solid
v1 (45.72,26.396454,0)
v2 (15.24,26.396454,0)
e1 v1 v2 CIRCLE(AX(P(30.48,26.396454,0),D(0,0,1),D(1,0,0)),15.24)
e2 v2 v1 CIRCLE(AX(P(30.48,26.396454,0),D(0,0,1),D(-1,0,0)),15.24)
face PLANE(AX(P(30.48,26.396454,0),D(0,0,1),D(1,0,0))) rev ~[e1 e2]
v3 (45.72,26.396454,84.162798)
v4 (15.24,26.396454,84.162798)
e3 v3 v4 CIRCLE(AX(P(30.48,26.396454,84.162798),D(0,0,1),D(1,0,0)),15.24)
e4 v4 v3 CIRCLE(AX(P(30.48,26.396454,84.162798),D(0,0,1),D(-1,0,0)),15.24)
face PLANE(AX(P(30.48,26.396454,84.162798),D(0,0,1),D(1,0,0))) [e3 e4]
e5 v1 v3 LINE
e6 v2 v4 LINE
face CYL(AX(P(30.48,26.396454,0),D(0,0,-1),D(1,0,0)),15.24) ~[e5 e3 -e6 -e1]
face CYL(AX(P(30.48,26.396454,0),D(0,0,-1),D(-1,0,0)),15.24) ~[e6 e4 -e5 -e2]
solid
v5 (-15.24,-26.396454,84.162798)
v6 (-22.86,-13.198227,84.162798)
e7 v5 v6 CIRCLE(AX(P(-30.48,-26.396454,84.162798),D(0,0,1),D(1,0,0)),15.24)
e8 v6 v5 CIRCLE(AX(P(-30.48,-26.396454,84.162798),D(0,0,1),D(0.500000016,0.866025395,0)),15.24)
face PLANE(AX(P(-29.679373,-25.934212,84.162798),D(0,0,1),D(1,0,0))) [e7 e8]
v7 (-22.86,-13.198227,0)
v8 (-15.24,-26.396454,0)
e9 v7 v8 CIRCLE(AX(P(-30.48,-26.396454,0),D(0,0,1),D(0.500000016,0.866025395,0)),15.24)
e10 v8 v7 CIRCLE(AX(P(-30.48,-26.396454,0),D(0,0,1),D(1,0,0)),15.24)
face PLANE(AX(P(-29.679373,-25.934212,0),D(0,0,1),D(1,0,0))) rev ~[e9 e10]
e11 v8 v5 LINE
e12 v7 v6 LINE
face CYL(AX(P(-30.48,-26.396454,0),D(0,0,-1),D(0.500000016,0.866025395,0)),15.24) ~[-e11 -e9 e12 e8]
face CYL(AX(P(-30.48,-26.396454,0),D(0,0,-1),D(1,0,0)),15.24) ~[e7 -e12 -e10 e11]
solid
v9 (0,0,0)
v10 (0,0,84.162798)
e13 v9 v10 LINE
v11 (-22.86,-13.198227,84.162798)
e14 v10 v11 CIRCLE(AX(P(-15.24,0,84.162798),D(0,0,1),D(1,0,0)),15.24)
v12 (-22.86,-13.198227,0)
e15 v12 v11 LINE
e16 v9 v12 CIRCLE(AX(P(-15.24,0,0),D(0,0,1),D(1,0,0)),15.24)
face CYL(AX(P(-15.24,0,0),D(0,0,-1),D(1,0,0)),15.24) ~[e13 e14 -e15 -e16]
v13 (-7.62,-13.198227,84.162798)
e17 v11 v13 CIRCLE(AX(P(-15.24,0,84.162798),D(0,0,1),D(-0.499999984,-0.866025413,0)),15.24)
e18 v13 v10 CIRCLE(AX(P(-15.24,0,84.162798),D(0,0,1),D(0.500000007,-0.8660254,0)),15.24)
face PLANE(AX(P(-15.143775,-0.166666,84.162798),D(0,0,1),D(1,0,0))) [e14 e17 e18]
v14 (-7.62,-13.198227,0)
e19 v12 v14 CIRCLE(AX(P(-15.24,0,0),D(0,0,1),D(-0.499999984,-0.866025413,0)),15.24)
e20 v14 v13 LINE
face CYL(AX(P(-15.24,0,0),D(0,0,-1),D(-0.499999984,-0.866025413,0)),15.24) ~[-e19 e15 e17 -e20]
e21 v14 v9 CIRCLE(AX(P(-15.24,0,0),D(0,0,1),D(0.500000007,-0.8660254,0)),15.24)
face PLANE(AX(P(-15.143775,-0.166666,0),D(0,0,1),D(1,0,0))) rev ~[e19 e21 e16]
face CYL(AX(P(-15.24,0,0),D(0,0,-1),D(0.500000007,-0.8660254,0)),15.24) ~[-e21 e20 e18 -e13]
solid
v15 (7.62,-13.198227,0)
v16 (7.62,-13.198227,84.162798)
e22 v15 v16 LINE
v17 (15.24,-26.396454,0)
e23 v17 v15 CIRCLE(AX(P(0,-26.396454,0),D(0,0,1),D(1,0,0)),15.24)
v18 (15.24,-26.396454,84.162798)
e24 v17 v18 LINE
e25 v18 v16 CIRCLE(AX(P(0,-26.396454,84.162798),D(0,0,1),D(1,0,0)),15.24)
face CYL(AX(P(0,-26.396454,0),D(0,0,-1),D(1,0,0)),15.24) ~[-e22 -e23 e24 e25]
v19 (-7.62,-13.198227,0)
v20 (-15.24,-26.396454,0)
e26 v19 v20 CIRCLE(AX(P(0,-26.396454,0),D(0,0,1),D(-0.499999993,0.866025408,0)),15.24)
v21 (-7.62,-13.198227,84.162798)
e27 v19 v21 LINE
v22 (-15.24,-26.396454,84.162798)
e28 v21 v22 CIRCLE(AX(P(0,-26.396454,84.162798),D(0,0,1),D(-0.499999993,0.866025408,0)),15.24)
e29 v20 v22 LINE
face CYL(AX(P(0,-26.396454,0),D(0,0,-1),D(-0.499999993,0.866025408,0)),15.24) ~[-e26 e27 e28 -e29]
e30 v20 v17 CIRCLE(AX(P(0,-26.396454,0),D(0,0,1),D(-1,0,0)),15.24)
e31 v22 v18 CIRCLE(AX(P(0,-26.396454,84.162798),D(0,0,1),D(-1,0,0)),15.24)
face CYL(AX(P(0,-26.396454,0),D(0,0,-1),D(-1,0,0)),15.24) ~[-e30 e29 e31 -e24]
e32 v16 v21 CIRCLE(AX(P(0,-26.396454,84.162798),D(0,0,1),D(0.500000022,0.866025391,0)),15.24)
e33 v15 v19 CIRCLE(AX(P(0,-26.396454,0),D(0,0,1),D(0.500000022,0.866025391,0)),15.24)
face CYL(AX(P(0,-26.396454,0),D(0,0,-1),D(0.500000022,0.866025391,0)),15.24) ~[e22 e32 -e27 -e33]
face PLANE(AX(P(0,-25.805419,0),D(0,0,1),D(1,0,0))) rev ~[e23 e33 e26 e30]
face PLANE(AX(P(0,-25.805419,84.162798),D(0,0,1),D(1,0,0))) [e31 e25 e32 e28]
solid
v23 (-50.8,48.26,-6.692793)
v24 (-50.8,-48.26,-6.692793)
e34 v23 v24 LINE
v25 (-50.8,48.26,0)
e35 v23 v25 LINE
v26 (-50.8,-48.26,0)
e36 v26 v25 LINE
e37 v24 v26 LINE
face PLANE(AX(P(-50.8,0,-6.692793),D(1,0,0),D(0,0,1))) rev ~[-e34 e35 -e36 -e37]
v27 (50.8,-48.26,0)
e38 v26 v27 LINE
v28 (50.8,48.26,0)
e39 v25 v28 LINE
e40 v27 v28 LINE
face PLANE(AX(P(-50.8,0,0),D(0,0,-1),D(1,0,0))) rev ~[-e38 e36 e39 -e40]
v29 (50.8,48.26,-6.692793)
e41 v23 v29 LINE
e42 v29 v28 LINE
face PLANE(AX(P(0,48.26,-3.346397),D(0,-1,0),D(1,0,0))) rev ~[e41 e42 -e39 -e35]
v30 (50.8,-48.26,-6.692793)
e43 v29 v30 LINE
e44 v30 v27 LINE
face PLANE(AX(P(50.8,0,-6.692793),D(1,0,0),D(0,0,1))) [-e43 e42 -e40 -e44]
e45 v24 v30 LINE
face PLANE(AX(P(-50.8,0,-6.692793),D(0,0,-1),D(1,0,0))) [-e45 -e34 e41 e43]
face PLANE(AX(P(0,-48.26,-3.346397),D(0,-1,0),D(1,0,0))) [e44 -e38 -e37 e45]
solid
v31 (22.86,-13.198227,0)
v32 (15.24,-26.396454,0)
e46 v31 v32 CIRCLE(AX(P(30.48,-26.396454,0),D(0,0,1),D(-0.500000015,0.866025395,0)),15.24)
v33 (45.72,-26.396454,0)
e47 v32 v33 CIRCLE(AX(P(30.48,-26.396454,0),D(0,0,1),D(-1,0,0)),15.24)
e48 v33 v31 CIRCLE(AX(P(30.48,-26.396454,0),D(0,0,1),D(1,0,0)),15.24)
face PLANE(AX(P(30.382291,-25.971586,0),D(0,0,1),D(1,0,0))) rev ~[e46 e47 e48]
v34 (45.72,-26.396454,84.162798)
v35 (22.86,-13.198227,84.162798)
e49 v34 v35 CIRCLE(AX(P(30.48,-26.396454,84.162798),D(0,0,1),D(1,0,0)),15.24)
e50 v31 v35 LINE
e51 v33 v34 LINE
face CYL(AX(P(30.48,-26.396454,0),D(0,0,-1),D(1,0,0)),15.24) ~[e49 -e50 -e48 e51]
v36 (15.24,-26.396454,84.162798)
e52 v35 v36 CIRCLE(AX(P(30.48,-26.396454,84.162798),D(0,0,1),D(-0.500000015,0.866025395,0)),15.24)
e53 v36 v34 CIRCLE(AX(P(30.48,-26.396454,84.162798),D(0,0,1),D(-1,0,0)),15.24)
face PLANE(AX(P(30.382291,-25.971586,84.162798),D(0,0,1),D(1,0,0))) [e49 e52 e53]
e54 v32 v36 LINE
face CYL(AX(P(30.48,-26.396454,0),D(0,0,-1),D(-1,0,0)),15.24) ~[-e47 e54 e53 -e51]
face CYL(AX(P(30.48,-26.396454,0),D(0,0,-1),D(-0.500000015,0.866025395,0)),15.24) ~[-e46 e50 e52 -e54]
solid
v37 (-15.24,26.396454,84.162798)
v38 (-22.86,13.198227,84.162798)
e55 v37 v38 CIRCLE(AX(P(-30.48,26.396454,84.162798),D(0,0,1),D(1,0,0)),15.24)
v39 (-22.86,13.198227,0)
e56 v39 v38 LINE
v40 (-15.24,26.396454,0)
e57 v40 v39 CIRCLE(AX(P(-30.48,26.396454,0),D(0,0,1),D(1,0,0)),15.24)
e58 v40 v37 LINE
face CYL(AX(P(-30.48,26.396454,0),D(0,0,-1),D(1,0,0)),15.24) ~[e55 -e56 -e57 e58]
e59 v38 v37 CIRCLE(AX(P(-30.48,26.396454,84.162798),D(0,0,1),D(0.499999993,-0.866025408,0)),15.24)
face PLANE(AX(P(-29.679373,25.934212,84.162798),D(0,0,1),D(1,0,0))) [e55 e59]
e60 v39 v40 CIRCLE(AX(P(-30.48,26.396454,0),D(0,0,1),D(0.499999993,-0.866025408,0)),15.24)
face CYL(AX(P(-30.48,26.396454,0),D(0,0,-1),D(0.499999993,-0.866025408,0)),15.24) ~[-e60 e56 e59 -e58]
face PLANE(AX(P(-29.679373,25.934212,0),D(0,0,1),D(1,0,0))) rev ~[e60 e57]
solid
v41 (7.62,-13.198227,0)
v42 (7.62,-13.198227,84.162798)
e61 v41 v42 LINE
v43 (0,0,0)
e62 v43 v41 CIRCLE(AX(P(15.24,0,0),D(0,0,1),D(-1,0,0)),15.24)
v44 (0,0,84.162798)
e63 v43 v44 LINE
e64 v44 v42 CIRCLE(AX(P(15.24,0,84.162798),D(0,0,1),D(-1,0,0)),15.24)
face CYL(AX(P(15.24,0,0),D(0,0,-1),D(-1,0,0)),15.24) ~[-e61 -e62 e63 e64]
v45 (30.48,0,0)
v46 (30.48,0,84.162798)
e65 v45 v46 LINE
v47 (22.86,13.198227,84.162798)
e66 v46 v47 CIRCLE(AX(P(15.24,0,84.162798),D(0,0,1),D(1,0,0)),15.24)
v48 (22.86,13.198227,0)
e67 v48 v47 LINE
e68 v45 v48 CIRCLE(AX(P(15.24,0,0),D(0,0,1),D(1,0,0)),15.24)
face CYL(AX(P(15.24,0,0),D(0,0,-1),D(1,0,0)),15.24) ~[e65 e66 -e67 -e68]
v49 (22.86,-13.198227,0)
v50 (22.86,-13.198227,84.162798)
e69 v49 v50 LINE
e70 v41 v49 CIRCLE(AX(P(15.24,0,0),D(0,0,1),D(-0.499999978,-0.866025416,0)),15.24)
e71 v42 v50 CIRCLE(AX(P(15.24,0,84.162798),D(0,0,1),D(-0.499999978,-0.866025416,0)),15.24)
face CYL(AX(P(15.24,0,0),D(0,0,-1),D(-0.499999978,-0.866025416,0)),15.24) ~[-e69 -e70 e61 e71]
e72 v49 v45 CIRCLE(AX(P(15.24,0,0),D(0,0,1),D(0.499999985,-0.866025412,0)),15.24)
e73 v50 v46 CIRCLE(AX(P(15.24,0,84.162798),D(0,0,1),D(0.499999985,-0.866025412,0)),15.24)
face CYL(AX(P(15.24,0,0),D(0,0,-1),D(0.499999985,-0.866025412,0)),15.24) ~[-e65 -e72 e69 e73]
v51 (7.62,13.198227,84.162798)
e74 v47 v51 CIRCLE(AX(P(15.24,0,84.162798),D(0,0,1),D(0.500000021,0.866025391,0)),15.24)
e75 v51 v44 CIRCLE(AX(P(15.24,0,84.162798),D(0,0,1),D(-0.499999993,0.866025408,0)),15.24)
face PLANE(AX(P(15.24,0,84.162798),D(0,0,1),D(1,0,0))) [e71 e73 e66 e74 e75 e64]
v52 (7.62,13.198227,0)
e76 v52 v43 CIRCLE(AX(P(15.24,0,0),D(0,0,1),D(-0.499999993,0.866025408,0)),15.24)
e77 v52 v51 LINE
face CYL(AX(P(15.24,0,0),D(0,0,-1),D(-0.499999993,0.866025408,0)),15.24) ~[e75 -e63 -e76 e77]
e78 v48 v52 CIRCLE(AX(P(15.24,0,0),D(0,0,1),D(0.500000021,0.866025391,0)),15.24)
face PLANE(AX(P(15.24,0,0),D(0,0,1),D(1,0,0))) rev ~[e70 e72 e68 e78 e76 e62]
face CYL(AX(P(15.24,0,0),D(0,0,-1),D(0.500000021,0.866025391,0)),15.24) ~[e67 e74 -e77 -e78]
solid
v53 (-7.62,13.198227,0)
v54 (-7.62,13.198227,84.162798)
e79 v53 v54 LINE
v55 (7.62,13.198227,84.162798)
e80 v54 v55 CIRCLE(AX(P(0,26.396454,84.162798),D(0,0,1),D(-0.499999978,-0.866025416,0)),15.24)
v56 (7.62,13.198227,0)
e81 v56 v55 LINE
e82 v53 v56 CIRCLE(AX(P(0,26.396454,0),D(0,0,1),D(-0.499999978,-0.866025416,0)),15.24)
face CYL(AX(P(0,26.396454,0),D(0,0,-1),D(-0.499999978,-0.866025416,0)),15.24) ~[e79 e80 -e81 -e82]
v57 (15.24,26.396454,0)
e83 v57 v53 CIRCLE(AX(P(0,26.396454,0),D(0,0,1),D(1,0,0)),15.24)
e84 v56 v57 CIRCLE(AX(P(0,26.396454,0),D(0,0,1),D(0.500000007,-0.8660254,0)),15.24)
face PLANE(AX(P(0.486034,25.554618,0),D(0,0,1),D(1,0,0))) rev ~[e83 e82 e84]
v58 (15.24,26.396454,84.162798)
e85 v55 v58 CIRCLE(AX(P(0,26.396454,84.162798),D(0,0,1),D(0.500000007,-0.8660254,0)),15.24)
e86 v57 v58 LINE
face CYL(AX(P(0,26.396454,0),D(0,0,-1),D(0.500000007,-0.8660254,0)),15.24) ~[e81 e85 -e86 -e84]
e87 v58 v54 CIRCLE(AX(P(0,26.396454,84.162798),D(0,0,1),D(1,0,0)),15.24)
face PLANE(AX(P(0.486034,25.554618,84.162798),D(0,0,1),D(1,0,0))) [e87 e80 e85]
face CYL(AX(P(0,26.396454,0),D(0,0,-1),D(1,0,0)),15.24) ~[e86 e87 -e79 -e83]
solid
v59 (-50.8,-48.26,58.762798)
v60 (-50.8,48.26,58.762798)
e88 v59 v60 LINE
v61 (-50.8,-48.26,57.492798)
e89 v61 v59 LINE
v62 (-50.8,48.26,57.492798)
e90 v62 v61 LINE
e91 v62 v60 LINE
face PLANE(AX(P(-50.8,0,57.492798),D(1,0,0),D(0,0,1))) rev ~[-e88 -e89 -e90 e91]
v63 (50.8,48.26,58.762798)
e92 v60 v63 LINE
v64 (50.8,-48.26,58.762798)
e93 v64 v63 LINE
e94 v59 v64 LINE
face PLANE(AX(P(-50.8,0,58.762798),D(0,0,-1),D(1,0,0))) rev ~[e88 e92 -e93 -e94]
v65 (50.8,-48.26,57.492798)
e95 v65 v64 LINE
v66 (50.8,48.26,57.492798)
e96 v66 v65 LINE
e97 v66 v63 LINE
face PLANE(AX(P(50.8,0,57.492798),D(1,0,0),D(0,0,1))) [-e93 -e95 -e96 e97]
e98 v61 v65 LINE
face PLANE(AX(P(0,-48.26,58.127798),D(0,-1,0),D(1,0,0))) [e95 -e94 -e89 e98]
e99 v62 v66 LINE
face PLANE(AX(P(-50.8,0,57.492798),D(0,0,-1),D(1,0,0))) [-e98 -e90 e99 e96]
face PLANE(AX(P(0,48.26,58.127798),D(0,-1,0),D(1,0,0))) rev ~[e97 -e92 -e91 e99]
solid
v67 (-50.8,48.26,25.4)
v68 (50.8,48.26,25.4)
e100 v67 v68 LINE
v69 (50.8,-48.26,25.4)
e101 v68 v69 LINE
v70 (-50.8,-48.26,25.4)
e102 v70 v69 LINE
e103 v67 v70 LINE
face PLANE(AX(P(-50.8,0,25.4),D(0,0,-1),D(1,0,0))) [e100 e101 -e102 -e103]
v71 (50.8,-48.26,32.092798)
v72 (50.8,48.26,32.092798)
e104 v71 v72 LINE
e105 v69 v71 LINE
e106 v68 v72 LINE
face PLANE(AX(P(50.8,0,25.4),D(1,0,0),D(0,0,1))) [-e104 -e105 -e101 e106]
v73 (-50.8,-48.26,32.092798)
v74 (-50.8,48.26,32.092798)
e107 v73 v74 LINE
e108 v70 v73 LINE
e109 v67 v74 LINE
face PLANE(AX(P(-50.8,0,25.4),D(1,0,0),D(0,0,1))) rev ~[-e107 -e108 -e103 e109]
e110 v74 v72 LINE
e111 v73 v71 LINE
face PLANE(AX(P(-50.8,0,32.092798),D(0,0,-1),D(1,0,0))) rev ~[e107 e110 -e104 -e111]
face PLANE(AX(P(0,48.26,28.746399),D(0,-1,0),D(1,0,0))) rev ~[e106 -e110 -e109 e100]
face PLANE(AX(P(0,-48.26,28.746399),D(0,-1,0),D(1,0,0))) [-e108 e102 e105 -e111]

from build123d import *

# Parameters (mm, degrees)
F1_DEPTH = 84.1627984
F2_W     = 101.6
F2_H     = 6.6927933697
F3_DEPTH = 48.26
F2_H_2   = 6.6927984
F2_H_3   = 1.27


# Not quite as in the source:
# - a feature names something its author has since deleted; it is built from what else it names


with BuildPart() as f1:
    # F0 (on Top) → F1 (new body)
    with BuildSketch(Plane.XY):
        with BuildLine():
            ThreePointArc((-22.8599997596, -13.1982272925), (-43.6782272231, -34.0164541872), (-15.24, -26.3964543073))
            ThreePointArc((-15.24, -26.3964543073), (-17.2817727769, -18.7764544275), (-22.8599997596, -13.1982272925))
        make_face()
    extrude(amount=F1_DEPTH)


with BuildPart() as f1b:
    # F0 (on Top) → F1, piece 2 (new body)
    with BuildSketch(Plane.XY):
        with BuildLine():
            ThreePointArc((-7.6199998958, -13.1982270935), (-13.1982271236, -18.7764542553), (-15.24, -26.3964543073))
            ThreePointArc((-15.24, -26.3964543073), (0, -41.6364543073), (15.24, -26.3964543073))
            ThreePointArc((15.24, -26.3964543073), (13.1982272501, -18.7764544743), (7.6200003339, -13.1982273465))
            ThreePointArc((7.6200003339, -13.1982273465), (2.529e-07, -11.1564543073), (-7.6199998958, -13.1982270935))
        make_face()
    extrude(amount=F1_DEPTH)


with BuildPart() as f1c:
    # F0 (on Top) → F1, piece 3 (new body)
    with BuildSketch(Plane.XY):
        with BuildLine():
            ThreePointArc((-22.8600001039, 13.1982270937), (-30.48, -1.988e-07), (-22.8599997596, -13.1982272925))
            ThreePointArc((-22.8599997596, -13.1982272925), (-15.2399998011, -15.24), (-7.6199998958, -13.1982270935))
            ThreePointArc((-7.6199998958, -13.1982270935), (-2.0417728163, -7.6199999479), (0, 0))
            ThreePointArc((0, 0), (-2.0417727499, 7.619999833), (-7.6199996661, 13.1982269609))
            ThreePointArc((-7.6199996661, 13.1982269609), (-15.2399998672, 15.24), (-22.8600001039, 13.1982270937))
        make_face()
    extrude(amount=F1_DEPTH)


with BuildPart() as f1d:
    # F0 (on Top) → F1, piece 4 (new body)
    with BuildSketch(Plane.XY):
        with BuildLine():
            ThreePointArc((22.8599997751, -13.1982272835), (17.2817727814, -18.7764544198), (15.24, -26.3964543073))
            ThreePointArc((15.24, -26.3964543073), (30.48, -41.6364543073), (45.72, -26.3964543073))
            ThreePointArc((45.72, -26.3964543073), (38.0999998875, -13.1982270887), (22.8599997751, -13.1982272835))
        make_face()
    extrude(amount=F1_DEPTH)


with BuildPart() as f1e:
    # F0 (on Top) → F1, piece 5 (new body)
    with BuildSketch(Plane.XY):
        with BuildLine():
            ThreePointArc((-15.24, 26.3964543073), (-43.6782271237, 34.0164543593), (-22.8600001039, 13.1982270937))
            ThreePointArc((-22.8600001039, 13.1982270937), (-17.2817728763, 18.7764542554), (-15.24, 26.3964543073))
        make_face()
    extrude(amount=F1_DEPTH)


with BuildPart() as f1f:
    # F0 (on Top) → F1, piece 6 (new body)
    with BuildSketch(Plane.XY):
        with BuildLine():
            ThreePointArc((0, 0), (2.0417729427, -7.620000167), (7.6200003339, -13.1982273465))
            ThreePointArc((7.6200003339, -13.1982273465), (15.2400000629, -15.24), (22.8599997751, -13.1982272835))
            ThreePointArc((22.8599997751, -13.1982272835), (28.4382270887, -7.6200001125), (30.48, 0))
            ThreePointArc((30.48, 0), (28.4382272477, 7.6199998371), (22.8600003259, 13.1982269655))
            ThreePointArc((22.8600003259, 13.1982269655), (15.2400002483, 15.24), (7.6200001042, 13.1982272138))
            ThreePointArc((7.6200001042, 13.1982272138), (2.0417728764, 7.6200000521), (0, 0))
        make_face()
    extrude(amount=F1_DEPTH)


with BuildPart() as f1g:
    # F0 (on Top) → F1, piece 7 (new body)
    with BuildSketch(Plane.XY):
        with BuildLine():
            ThreePointArc((-15.24, 26.3964543073), (-13.1982270573, 18.7764541404), (-7.6199996661, 13.1982269609))
            ThreePointArc((-7.6199996661, 13.1982269609), (2.529e-07, 11.1564543073), (7.6200001042, 13.1982272138))
            ThreePointArc((7.6200001042, 13.1982272138), (13.1982271837, 18.7764543594), (15.24, 26.3964543073))
            ThreePointArc((15.24, 26.3964543073), (0, 41.6364543073), (-15.24, 26.3964543073))
        make_face()
    extrude(amount=F1_DEPTH)


with BuildPart() as f1h:
    # F0 (on Top) → F1, piece 8 (new body)
    with BuildSketch(Plane.XY):
        with BuildLine():
            ThreePointArc((45.72, 26.3964543073), (30.48, 41.6364543073), (15.24, 26.3964543073))
            ThreePointArc((15.24, 26.3964543073), (17.2817729404, 18.7764541444), (22.8600003259, 13.1982269655))
            ThreePointArc((22.8600003259, 13.1982269655), (38.1000001629, 13.1982272477), (45.72, 26.3964543073))
        make_face()
    extrude(amount=F1_DEPTH)


with BuildPart() as f3:
    # F2 (on Front) → F3 (new body, symmetric)
    with BuildSketch(Plane.XZ):
        with Locations((0, -3.3463966849)):
            Rectangle(F2_W, F2_H)
    extrude(amount=F3_DEPTH, both=True)


with BuildPart() as f3b:
    # F2 (on Front) → F3, piece 2 (new body, symmetric)
    with BuildSketch(Plane.XZ):
        with Locations((0, 28.7463992)):
            Rectangle(F2_W, F2_H_2)
    extrude(amount=F3_DEPTH, both=True)


with BuildPart() as f3c:
    # F2 (on Front) → F3, piece 3 (new body, symmetric)
    with BuildSketch(Plane.XZ):
        with Locations((0, 58.1277984)):
            Rectangle(F2_W, F2_H_3)
    extrude(amount=F3_DEPTH, both=True)


solid = Compound([f1.part, f1b.part, f1c.part, f1d.part, f1e.part, f1f.part, f1g.part, f1h.part, f3.part, f3b.part, f3c.part])
